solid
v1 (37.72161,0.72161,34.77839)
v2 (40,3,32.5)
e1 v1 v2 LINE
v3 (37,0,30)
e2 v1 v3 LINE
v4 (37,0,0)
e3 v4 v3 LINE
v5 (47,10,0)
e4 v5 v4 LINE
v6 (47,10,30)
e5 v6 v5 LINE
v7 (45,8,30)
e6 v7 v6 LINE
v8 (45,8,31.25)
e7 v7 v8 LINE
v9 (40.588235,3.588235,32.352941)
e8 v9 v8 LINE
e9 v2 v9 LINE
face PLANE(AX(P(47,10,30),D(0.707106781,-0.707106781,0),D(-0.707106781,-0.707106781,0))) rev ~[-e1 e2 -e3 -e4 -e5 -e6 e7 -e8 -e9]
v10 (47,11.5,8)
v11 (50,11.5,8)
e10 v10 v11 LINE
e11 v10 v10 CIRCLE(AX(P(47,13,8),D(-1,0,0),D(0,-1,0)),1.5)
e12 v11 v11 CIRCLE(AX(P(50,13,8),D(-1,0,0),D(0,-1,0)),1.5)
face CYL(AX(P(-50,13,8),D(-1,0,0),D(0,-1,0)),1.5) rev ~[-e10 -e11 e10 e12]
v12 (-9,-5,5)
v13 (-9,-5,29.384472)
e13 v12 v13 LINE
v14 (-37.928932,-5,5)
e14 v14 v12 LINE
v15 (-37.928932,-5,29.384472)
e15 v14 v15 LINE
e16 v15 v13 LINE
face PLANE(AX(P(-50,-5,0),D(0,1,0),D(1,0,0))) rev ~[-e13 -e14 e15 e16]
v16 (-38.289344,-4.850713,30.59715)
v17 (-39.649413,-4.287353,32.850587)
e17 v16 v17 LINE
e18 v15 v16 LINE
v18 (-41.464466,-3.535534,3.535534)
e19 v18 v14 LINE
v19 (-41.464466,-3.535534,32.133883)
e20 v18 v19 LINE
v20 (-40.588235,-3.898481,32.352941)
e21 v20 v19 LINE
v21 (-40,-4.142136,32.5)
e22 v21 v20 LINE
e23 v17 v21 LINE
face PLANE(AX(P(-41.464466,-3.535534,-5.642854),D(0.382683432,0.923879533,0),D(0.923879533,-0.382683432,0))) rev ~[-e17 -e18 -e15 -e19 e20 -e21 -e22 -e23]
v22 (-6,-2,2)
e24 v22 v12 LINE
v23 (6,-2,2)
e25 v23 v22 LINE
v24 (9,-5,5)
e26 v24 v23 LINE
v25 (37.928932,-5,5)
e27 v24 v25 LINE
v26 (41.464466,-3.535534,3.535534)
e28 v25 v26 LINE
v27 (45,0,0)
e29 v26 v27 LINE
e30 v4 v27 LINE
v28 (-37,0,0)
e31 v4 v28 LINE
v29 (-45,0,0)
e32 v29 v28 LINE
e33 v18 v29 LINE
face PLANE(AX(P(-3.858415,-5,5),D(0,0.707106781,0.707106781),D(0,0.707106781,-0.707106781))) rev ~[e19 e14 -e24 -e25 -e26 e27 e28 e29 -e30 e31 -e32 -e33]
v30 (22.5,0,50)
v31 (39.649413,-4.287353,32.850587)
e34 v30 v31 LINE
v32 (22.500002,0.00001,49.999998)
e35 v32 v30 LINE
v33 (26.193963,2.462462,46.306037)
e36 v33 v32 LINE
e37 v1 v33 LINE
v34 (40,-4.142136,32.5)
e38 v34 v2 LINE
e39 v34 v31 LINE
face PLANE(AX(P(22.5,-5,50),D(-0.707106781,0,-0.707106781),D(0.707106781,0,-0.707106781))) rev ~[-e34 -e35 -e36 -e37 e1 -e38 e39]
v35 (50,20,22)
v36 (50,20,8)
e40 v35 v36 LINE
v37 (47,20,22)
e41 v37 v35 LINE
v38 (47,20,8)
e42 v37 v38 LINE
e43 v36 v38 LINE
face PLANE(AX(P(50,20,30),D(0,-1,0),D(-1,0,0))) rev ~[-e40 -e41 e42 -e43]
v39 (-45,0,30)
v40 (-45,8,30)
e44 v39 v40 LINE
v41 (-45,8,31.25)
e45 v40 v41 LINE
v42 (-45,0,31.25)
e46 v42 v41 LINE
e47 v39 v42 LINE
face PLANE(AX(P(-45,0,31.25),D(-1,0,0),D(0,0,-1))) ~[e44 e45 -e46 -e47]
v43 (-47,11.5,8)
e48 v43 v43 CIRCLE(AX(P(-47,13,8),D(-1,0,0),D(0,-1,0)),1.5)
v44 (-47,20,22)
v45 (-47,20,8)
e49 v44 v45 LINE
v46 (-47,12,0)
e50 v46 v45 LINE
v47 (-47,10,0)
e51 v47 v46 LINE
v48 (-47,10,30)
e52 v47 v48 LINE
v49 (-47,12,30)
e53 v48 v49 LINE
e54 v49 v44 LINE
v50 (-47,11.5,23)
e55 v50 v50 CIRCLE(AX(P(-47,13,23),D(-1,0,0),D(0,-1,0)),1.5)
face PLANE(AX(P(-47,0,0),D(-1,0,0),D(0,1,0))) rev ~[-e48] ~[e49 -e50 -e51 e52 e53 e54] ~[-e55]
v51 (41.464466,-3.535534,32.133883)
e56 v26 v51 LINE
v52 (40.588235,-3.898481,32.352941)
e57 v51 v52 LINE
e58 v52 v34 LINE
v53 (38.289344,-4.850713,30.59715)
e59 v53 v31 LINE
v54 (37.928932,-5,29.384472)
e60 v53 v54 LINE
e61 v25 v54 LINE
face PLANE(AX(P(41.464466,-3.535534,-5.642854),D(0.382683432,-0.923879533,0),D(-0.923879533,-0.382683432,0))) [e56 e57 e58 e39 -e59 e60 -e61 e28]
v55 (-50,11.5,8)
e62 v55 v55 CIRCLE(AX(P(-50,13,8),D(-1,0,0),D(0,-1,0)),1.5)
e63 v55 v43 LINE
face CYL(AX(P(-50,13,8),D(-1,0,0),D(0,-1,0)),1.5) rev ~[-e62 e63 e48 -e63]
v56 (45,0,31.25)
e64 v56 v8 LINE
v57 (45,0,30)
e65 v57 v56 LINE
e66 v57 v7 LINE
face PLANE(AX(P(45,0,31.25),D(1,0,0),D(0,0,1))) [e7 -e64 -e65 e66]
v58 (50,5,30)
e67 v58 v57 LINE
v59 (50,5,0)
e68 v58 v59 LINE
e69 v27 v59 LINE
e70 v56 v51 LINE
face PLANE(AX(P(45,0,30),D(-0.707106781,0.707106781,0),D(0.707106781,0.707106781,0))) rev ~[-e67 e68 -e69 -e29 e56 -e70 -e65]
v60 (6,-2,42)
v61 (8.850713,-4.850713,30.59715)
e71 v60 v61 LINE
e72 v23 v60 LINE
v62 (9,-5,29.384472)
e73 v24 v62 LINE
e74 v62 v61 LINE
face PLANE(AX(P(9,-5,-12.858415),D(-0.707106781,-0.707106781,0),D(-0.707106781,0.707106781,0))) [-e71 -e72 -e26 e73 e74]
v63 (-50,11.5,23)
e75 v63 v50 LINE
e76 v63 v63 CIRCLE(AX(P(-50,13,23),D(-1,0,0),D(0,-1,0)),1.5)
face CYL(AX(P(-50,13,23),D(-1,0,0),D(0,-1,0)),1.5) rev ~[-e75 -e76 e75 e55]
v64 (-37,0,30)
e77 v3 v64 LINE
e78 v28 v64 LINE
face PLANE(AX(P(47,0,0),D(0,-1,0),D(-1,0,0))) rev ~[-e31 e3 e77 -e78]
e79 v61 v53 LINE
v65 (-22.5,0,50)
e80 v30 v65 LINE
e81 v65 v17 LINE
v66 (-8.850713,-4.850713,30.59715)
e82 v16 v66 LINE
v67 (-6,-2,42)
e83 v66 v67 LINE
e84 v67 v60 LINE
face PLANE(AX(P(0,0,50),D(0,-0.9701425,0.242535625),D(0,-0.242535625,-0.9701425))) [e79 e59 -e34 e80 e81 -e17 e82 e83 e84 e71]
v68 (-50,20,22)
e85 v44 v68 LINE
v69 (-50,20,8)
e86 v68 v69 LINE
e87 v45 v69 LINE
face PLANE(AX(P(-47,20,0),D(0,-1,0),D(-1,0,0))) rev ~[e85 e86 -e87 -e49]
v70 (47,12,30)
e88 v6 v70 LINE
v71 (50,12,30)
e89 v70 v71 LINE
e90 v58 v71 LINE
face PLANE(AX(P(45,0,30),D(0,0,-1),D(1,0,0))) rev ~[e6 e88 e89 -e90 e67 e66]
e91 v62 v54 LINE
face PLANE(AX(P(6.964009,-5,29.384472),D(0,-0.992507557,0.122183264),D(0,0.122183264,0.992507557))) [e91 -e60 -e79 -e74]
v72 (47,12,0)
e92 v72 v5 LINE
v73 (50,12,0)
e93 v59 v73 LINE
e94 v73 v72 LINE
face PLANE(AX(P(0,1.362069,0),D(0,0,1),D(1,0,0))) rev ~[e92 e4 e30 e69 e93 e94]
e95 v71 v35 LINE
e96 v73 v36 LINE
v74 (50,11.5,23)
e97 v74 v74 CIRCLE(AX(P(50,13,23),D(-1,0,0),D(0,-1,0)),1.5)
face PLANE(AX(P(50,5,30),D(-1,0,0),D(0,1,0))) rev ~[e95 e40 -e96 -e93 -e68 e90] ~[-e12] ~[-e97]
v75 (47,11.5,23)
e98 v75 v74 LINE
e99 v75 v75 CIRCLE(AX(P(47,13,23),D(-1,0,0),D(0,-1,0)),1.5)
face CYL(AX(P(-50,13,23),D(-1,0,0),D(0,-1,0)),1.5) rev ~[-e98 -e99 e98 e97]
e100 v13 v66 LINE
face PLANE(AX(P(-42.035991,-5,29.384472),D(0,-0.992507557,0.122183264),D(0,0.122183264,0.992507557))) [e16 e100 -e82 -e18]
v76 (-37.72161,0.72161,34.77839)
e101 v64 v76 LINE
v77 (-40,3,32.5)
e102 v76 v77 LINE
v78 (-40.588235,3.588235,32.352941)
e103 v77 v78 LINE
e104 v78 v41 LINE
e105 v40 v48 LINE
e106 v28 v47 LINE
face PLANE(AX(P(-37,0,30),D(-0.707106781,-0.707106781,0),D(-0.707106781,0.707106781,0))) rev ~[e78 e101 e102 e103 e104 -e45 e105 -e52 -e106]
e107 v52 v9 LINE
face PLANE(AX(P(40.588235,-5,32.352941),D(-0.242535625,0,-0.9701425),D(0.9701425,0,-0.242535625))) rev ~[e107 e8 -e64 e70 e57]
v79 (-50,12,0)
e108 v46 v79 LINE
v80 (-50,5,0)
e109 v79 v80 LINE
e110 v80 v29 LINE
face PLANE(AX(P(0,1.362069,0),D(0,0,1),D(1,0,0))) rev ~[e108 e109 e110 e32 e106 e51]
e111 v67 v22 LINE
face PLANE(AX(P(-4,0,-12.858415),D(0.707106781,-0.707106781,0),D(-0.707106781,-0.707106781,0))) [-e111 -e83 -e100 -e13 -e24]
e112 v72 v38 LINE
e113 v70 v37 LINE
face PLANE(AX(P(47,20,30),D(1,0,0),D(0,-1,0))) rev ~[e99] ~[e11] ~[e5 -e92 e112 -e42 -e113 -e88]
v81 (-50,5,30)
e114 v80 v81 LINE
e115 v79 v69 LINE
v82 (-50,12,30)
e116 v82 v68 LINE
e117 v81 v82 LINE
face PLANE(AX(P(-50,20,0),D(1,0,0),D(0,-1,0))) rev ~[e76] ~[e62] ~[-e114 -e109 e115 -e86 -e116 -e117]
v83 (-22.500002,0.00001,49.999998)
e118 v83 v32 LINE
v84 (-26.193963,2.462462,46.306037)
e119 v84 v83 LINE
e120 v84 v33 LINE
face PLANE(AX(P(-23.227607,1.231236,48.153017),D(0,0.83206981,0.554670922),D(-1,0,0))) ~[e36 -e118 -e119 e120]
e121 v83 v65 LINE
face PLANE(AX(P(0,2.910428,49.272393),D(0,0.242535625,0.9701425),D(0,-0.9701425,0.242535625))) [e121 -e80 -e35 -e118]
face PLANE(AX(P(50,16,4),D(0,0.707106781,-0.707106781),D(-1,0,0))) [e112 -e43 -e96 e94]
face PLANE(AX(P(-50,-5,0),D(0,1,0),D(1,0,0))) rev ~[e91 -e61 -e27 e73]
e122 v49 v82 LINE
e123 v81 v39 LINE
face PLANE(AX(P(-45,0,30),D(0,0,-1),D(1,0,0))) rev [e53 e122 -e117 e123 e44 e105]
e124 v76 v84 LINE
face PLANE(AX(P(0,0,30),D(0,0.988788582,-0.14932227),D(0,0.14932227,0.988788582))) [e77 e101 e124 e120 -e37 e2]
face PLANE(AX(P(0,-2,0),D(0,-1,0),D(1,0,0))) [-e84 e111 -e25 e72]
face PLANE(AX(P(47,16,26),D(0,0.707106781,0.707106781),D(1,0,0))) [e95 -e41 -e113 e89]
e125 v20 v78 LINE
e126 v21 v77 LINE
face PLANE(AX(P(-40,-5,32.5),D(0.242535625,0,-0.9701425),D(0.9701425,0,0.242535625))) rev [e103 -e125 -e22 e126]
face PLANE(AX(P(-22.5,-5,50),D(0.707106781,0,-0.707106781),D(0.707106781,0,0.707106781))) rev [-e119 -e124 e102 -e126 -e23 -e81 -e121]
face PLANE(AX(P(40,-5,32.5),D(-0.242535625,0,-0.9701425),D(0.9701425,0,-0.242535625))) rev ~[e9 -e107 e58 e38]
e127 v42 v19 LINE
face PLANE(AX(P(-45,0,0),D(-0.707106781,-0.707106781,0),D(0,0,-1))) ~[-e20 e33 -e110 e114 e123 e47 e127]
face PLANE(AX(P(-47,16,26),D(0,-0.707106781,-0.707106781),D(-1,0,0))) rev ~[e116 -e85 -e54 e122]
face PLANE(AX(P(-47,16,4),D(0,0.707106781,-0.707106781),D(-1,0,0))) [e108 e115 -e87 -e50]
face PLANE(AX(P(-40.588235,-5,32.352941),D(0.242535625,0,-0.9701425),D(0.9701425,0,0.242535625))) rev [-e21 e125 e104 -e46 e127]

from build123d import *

# Parameters (mm, degrees)
F1_DEPTH      = 30
F2_SIZE       = 10
F4_DEPTH      = 50
F5_DEPTH      = 20
F6_DEPTH      = 25
F8_DEPTH      = 25.001
F9_DEPTH      = 25
F11_W         = 8
F11_H         = 3
F12_DEPTH     = 50.001
F13_T1_DEPTH  = 61.7168298797
F13_T3_DEPTH  = 40.0719817161
F13_T5_DEPTH  = 45.2357066129
F13_T10_DEPTH = 64.7177203375
F13_T15_DEPTH = 64.7177203375
F14_T1_DEPTH  = 56.7168298797
F14_T3_DEPTH  = 45.2357066129
F14_T5_DEPTH  = 35.0719817161
F15_R         = 1.5
F16_DEPTH     = 100.001
F18_SIZE      = 8
F19_SIZE      = 2.99999


# Not quite as in the source:
# - a fillet or chamfer that OpenCascade refuses, or shapes differently, is made with other operations: its cross-section is extruded or revolved along the edge and cut away or added
# - a fillet or chamfer is up to 0.001 mm smaller than in the source, because OpenCascade refuses the exact size


with BuildPart() as f1:
    # F0 (on Top) → F1 (new body)
    with BuildSketch(Plane.XY):
        Polygon((-47, 20), (-50, 20), (-50, -5), (50, -5), (50, 20), (47, 20), (47, 0), (-47, 0), align=None)
    extrude(amount=F1_DEPTH)

    # F2
    f2_edges = [f1.edges().sort_by_distance(p)[0] for p in [
        (-47, 0, 15),
        (47, 0, 15),
        (-50, -5, 15),
        (50, -5, 15),
    ]]
    chamfer(f2_edges, length=F2_SIZE)

    # F3 (on Right) → F4 (join, symmetric)
    with BuildSketch(Plane.YZ):
        Polygon((-5, 30), (0, 30), (2.9104275004, 49.2723931249), (0, 50), align=None)
    extrude(amount=F4_DEPTH, both=True)

    # F5 (add): faces of the model
    f5_faces = [f1.faces().sort_by_distance(p)[0] for p in [
        (46.0427350427, 7.6495726496, 30),
        (-46.0427350427, 7.6495726496, 30),
    ]]
    extrude(f5_faces, amount=F5_DEPTH)

    # F6 (cut): faces of the model
    f6_faces = [f1.faces().sort_by_distance(p)[0] for p in [
        (46.1111111111, -2.7777777778, 30),
        (-46.1111111111, -2.7777777778, 30),
    ]]
    extrude(f6_faces, amount=-F6_DEPTH, mode=Mode.SUBTRACT)

    # F7 (on face) → F8 (cut, through all)
    with BuildSketch(Plane.XZ.offset(5)):
        Polygon((40.5882352941, 32.3529411765), (45, 50), (37, 50), (22.5, 50), (40, 32.5), align=None)
        Polygon((45, 31.25), (45, 50), (40.5882352941, 32.3529411765), align=None)
        Polygon((45, 50), (47.9104275004, 49.2723931249), (45.1819017188, 31.2045245703), (50, 30), (50, 50), align=None)
    extrude(amount=-F8_DEPTH, mode=Mode.SUBTRACT)

    # F9 (cut): a face of the model
    f9_faces = [f1.faces().sort_by_distance(p)[0] for p in [
        (46.0411372728, 0, 41.900989059),
    ]]
    extrude(f9_faces, amount=-F9_DEPTH, mode=Mode.SUBTRACT)

    # F10: F1 across plane


with BuildPart() as f1_1:
    add(f1.part)
    add(f1.part.mirror(Plane.YZ), mode=Mode.INTERSECT)

    # F11 (on face) → F12 (cut, through all)
    with BuildSketch(Plane(origin=(0, 0, 0), x_dir=(1, 0, 0), z_dir=(0, 0, -1))):
        with Locations((0, 3.5)):
            Rectangle(F11_W, F11_H)
    extrude(amount=-F12_DEPTH, mode=Mode.SUBTRACT)

    # F13: chamfer of 5 on 5 edges, made by hand

    # F13_s2 → F13_t1 (cut)
    with BuildSketch(Plane.YZ.offset(-52.8584149398)):
        Polygon((0, 0), (-5, 5), (-5, 0), align=None)
    extrude(amount=F13_T1_DEPTH, mode=Mode.SUBTRACT)

    # F13_s4 → F13_t3 (cut)
    with BuildSketch(Plane.YZ.offset(-42.0359908581)):
        Polygon((-5, 29.3844718719), (-4.8507125007, 30.5971499971), (-5, 30), align=None)
    extrude(amount=F13_T3_DEPTH, mode=Mode.SUBTRACT)

    # F13_s6 → F13_t5 (cut)
    with BuildSketch(Plane.XY.offset(-5.6428543011)):
        Polygon((-41.4644660941, -3.5355339059), (-37.9289321881, -5), (-40, -5), align=None)
    extrude(amount=F13_T5_DEPTH, mode=Mode.SUBTRACT)


with BuildPart() as f13_tool8:
    # F13_s9 → F13_t10 (new body)
    with BuildSketch(Plane.XY.offset(-12.8584149398)):
        Polygon((9, -5), (4, 0), (4, -5), align=None)
    extrude(amount=F13_T10_DEPTH)

    split(bisect_by=Plane.XZ.offset(2), keep=Keep.TOP)


with BuildPart() as f1_2:
    add(f1_1.part)

    # F13_t7: cut F13_tool8
    add(f13_tool8.part, mode=Mode.SUBTRACT)


with BuildPart() as f13_tool13:
    # F13_s14 → F13_t15 (new body)
    with BuildSketch(Plane.XY.offset(-12.8584149398)):
        Polygon((-4, 0), (-9, -5), (-4, -5), align=None)
    extrude(amount=F13_T15_DEPTH)

    split(bisect_by=Plane.XZ.offset(2), keep=Keep.TOP)


with BuildPart() as f1_3:
    add(f1_2.part)

    # F13_t12: cut F13_tool13
    add(f13_tool13.part, mode=Mode.SUBTRACT)

    # F14: chamfer of 5 on 3 edges, made by hand

    # F14_s2 → F14_t1 (cut)
    with BuildSketch(Plane.YZ.offset(-3.8584149398)):
        Polygon((-5, 5), (0, 0), (-5, 0), align=None)
    extrude(amount=F14_T1_DEPTH, mode=Mode.SUBTRACT)

    # F14_s4 → F14_t3 (cut)
    with BuildSketch(Plane.XY.offset(-5.6428543011)):
        Polygon((41.4644660941, -3.5355339059), (37.9289321881, -5), (40, -5), align=None)
    extrude(amount=F14_T3_DEPTH, mode=Mode.SUBTRACT)

    # F14_s6 → F14_t5 (cut)
    with BuildSketch(Plane.YZ.offset(6.9640091419)):
        Polygon((-5, 29.3844718719), (-4.8507125007, 30.5971499971), (-5, 30), align=None)
    extrude(amount=F14_T5_DEPTH, mode=Mode.SUBTRACT)

    # F15 (on face) → F16 (cut, through all)
    with BuildSketch(Plane(origin=(-50, 0, 0), x_dir=(0, -1, 0), z_dir=(-1, 0, 0))):
        with Locations((-13, 23)):
            Circle(F15_R)
        with Locations((-13, 8)):
            Circle(F15_R)
    extrude(amount=-F16_DEPTH, mode=Mode.SUBTRACT)

    # F17: F1 across plane


with BuildPart() as f1_4:
    add(f1_3.part)
    add(f1_3.part.mirror(Plane.YZ), mode=Mode.INTERSECT)

    # F18
    f18_edges = [f1_4.edges().sort_by_distance(p)[0] for p in [
        (48.5, 20, 0),
        (-48.5, 20, 0),
        (-48.5, 20, 30),
        (48.5, 20, 30),
    ]]
    chamfer(f18_edges, length=F18_SIZE)

    # F19 (size 3 in the source; OpenCascade refuses exactly that, so slightly less here)
    f19_edges = [f1_4.edges().sort_by_distance(p)[0] for p in [
        (0, 2.910428, 49.272393),
    ]]
    chamfer(f19_edges, length=F19_SIZE)


solid = f1_4.part
